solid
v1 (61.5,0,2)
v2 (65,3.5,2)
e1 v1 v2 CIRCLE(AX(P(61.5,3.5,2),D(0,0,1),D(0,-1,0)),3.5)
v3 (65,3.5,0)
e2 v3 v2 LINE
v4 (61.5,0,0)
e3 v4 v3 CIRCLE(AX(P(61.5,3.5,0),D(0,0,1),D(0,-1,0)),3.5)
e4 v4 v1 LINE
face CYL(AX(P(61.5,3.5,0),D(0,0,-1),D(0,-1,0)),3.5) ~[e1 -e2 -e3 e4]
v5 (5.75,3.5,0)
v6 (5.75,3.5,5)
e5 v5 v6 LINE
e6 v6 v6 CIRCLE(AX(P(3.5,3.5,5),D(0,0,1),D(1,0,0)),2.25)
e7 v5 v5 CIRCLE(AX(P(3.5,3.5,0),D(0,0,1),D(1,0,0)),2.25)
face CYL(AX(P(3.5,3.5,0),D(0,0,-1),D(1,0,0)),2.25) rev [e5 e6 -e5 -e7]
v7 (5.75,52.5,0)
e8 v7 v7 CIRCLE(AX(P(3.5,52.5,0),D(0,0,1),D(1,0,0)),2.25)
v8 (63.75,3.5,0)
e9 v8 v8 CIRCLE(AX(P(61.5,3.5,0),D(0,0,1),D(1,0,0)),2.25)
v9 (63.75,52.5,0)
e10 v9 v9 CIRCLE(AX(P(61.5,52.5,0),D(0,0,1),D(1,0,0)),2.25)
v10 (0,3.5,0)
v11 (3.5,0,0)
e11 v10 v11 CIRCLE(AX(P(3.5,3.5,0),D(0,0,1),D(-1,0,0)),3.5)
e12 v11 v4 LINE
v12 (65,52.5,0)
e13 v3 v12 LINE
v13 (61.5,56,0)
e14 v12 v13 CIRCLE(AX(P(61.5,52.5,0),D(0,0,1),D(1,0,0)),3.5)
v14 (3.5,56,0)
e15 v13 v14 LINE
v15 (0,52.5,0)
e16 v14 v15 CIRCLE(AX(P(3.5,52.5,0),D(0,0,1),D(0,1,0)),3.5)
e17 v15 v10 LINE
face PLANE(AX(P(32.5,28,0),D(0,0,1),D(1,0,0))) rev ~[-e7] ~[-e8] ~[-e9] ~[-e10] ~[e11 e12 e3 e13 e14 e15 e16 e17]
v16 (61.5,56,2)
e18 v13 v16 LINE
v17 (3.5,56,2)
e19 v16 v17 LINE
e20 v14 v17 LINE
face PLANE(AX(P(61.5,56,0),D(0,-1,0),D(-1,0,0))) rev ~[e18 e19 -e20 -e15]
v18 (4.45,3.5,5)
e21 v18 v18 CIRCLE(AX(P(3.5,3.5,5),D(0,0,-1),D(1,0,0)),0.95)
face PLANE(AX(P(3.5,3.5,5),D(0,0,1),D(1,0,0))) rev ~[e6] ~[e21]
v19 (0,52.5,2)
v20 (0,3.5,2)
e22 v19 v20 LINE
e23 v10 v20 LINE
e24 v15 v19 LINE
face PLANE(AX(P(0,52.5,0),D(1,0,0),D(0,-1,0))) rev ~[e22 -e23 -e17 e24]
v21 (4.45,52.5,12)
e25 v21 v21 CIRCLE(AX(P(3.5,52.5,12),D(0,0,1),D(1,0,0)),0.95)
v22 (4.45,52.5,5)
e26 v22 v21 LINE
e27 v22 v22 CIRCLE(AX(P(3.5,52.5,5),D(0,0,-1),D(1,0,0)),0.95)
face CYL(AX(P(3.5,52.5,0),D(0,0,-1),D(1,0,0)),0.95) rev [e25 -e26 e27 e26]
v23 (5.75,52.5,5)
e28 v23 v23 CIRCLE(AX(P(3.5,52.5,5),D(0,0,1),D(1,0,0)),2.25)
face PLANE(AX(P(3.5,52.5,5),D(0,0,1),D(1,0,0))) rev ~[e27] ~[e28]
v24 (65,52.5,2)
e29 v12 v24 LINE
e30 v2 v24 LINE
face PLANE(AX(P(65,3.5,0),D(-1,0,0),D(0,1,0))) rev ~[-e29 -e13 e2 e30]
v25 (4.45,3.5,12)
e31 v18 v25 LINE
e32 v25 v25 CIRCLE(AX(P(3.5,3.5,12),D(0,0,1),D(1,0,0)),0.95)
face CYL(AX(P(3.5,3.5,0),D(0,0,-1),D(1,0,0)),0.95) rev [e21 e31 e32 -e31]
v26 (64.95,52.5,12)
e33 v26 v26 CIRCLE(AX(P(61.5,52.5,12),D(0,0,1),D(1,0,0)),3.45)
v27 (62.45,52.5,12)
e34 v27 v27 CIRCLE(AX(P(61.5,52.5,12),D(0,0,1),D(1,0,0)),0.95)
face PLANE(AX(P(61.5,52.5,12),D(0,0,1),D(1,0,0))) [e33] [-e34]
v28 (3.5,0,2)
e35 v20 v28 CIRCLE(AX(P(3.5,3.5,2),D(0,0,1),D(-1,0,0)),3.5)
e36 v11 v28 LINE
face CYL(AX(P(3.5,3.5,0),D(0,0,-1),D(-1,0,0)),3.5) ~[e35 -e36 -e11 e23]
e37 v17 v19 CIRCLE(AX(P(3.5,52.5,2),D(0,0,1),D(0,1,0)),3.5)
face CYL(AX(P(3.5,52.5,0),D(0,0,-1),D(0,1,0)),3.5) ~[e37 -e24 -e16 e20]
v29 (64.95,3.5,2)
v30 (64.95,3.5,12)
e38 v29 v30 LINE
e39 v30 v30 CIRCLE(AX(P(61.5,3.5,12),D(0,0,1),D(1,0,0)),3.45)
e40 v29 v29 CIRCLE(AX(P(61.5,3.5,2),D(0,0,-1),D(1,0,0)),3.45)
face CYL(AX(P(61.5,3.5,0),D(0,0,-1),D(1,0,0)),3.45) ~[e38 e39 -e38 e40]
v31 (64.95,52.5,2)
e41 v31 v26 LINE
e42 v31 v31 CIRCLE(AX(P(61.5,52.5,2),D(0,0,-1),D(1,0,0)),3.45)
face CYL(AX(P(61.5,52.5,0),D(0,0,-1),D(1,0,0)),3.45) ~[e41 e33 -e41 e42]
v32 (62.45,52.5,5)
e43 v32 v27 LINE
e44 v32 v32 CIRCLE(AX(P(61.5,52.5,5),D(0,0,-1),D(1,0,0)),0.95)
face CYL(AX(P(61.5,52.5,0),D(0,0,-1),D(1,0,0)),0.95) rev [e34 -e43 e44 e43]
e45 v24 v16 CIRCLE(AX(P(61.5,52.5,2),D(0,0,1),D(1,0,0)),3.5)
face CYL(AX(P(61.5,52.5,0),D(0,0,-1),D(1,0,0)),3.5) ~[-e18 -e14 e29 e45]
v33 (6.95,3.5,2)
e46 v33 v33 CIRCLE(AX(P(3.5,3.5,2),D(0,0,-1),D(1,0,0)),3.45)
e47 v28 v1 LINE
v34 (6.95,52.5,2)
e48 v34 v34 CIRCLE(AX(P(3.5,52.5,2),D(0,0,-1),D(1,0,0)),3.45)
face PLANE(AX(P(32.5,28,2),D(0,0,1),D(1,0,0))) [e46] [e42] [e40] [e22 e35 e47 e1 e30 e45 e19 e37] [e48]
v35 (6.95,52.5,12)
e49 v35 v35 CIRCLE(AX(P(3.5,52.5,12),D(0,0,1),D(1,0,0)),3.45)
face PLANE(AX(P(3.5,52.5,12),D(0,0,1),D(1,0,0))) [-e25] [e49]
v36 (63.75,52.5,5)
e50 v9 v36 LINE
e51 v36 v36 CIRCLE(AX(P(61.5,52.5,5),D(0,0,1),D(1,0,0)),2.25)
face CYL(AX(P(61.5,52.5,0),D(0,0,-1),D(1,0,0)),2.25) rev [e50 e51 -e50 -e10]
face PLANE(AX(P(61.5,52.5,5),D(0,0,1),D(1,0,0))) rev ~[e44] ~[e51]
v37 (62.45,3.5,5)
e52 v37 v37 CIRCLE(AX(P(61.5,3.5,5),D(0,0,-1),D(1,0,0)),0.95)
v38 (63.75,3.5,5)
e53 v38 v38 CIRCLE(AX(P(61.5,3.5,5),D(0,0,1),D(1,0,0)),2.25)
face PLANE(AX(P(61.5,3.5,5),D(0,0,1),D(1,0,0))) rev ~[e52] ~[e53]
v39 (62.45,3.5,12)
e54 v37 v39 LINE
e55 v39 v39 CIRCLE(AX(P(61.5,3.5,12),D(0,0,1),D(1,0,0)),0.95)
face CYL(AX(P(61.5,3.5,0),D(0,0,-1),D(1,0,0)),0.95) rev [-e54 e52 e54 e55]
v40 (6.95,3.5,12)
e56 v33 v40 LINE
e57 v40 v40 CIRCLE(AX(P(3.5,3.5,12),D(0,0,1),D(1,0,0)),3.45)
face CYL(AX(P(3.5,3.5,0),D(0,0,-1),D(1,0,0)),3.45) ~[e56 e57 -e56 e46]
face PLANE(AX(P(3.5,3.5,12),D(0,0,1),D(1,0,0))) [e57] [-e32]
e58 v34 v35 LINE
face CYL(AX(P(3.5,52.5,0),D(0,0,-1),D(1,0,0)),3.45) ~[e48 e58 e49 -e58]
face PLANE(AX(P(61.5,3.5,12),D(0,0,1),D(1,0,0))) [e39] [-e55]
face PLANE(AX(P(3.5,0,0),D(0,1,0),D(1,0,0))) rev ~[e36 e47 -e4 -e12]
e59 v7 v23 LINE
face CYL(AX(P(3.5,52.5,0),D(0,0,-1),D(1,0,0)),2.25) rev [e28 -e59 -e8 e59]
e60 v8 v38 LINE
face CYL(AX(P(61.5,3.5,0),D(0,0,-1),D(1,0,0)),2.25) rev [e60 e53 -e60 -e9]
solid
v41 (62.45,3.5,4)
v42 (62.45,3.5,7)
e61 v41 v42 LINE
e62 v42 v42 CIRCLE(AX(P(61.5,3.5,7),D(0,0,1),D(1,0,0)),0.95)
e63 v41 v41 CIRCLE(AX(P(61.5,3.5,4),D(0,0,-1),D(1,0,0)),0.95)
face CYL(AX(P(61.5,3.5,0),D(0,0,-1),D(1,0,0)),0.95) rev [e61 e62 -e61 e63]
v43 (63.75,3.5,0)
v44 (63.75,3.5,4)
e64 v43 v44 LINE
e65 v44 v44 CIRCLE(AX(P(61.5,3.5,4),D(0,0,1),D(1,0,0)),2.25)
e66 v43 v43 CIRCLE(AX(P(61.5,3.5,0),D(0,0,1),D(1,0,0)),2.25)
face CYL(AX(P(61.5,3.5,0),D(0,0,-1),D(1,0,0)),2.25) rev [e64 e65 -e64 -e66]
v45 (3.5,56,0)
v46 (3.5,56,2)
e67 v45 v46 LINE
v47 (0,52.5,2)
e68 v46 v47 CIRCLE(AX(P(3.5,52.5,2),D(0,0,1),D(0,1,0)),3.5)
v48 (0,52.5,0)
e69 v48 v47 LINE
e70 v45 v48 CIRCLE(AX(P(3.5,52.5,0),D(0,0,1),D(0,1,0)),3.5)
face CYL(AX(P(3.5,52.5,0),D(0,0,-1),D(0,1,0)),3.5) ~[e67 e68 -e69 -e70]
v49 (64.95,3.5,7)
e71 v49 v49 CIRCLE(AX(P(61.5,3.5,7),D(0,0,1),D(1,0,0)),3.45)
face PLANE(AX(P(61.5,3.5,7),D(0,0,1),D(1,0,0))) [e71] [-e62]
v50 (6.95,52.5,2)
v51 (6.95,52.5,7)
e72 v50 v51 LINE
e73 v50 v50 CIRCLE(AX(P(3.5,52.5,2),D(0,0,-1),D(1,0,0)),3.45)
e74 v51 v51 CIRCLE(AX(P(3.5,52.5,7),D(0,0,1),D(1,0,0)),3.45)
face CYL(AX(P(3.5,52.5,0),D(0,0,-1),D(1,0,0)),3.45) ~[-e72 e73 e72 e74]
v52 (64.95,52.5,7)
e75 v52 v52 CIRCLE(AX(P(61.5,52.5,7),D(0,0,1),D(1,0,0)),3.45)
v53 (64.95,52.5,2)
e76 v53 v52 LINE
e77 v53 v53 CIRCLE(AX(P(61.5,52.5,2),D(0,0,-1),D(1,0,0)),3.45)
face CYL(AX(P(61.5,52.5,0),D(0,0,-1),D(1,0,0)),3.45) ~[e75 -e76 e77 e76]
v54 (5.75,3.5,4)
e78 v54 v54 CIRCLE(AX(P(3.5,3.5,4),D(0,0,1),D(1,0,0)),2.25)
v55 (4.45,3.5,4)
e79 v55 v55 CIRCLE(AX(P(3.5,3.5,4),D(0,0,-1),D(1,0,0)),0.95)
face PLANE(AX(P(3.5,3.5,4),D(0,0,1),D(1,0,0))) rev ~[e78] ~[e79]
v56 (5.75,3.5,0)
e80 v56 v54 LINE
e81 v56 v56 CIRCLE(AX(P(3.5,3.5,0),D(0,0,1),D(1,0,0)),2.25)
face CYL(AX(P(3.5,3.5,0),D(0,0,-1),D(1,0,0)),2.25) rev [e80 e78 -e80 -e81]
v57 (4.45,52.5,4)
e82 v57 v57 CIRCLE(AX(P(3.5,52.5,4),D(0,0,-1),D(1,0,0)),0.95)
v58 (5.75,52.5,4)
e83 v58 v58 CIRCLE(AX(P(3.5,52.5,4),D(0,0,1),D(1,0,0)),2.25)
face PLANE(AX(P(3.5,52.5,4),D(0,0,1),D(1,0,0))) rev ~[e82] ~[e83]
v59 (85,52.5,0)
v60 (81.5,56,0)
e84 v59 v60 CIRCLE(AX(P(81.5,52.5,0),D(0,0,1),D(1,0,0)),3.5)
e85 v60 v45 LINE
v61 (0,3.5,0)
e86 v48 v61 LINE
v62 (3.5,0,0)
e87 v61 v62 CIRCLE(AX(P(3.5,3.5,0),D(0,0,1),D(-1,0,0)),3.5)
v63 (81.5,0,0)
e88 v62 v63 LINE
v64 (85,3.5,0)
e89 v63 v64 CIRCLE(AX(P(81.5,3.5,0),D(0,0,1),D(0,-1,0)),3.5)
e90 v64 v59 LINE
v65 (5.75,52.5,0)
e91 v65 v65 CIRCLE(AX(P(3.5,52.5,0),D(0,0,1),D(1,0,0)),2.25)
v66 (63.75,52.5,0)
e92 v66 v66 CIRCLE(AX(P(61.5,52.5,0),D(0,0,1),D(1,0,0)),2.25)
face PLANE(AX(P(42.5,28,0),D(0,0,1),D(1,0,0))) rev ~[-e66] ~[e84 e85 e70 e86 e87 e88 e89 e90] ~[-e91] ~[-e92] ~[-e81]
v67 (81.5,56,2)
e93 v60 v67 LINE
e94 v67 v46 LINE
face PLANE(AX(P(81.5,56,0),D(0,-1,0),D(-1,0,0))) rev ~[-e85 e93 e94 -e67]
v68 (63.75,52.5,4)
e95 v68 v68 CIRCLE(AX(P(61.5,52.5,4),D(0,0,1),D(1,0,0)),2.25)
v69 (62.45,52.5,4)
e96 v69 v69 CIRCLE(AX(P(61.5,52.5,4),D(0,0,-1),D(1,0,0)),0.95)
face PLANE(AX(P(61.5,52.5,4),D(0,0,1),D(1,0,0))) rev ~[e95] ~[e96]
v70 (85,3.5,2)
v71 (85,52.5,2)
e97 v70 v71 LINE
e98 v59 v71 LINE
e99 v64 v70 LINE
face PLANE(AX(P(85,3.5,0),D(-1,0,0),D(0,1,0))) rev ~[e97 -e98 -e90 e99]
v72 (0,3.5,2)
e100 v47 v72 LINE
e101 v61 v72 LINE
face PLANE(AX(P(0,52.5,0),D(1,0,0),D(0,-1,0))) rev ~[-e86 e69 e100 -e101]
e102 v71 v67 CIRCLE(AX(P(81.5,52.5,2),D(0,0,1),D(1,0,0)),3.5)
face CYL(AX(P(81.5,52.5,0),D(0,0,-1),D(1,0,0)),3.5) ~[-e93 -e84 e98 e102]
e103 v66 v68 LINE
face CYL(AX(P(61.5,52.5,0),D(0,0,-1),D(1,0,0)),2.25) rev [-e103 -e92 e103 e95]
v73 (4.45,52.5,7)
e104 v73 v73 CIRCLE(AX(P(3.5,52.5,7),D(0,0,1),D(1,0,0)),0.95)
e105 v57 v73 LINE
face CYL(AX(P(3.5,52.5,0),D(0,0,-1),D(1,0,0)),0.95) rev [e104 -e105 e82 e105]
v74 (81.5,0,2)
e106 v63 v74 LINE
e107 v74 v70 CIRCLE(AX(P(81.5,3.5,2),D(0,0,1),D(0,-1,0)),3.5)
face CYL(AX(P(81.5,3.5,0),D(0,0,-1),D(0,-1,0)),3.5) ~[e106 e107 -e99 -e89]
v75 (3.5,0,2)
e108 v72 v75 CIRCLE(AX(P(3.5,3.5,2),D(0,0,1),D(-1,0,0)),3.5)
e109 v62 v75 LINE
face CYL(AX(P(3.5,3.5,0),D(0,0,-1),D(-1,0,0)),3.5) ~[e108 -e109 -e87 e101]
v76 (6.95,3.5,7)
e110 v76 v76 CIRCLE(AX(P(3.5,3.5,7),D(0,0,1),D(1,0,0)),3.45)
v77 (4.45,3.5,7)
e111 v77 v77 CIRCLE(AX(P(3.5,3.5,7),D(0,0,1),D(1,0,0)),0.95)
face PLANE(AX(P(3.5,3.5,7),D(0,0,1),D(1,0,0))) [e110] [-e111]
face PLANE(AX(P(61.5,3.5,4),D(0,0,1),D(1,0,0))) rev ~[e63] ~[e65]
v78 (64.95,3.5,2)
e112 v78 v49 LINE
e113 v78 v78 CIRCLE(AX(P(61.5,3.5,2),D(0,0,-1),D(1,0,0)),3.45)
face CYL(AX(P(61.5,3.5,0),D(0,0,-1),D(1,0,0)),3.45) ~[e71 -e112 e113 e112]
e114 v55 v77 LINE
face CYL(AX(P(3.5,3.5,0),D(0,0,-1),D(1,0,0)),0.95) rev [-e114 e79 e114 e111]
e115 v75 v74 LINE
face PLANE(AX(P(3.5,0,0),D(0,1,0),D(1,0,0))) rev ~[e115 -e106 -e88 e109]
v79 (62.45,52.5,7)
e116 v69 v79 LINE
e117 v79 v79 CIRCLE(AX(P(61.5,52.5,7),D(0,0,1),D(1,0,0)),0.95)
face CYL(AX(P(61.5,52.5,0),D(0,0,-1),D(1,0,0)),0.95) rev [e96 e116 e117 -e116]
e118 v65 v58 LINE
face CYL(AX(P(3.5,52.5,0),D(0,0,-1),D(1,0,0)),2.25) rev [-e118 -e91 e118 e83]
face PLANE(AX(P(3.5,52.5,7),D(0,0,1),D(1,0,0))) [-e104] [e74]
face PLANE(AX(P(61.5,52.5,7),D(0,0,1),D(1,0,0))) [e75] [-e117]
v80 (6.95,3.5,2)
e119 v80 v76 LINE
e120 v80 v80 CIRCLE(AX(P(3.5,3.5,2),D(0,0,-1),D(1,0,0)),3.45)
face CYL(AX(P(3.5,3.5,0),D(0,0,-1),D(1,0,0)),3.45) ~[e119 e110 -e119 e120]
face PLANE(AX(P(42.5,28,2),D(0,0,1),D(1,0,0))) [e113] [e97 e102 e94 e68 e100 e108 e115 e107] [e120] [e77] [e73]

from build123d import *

# Parameters (mm, degrees)
F0_R     = 3.45
F0_R_2   = 2.25
F2_DEPTH = 2
F0_R_3   = 0.95
F3_DEPTH = 7
F1_R     = 3.45
F1_R_2   = 2.25
F4_DEPTH = 2
F1_R_3   = 0.95
F5_DEPTH = 12
F6_DEPTH = 4
F7_DEPTH = 5


with BuildPart() as f2:
    # F0 (on Top) → F2 (new body)
    with BuildSketch(Plane.XY):
        with BuildLine():
            ThreePointArc((0, 3.5), (1.0251262658, 1.0251262658), (3.5, 0))
            Line((3.5, 0), (81.5, 0))
            ThreePointArc((81.5, 0), (83.9748737342, 1.0251262658), (85, 3.5))
            Line((85, 3.5), (85, 52.5))
            ThreePointArc((85, 52.5), (83.9748737342, 54.9748737342), (81.5, 56))
            Line((81.5, 56), (3.5, 56))
            ThreePointArc((3.5, 56), (1.0251262658, 54.9748737342), (0, 52.5))
            Line((0, 52.5), (0, 3.5))
        make_face()
        with Locations((3.5, 3.5)):
            Circle(F0_R, mode=Mode.SUBTRACT)
        with Locations((61.5, 3.5)):
            Circle(F0_R, mode=Mode.SUBTRACT)
        with Locations((3.5, 52.5)):
            Circle(F0_R, mode=Mode.SUBTRACT)
        with Locations((61.5, 52.5)):
            Circle(F0_R, mode=Mode.SUBTRACT)
        with Locations((3.5, 52.5)):
            Circle(F0_R)
        with Locations((3.5, 52.5)):
            Circle(F0_R_2, mode=Mode.SUBTRACT)
        with Locations((61.5, 52.5)):
            Circle(F0_R)
        with Locations((61.5, 52.5)):
            Circle(F0_R_2, mode=Mode.SUBTRACT)
        with Locations((61.5, 3.5)):
            Circle(F0_R)
        with Locations((61.5, 3.5)):
            Circle(F0_R_2, mode=Mode.SUBTRACT)
        with Locations((3.5, 3.5)):
            Circle(F0_R)
        with Locations((3.5, 3.5)):
            Circle(F0_R_2, mode=Mode.SUBTRACT)
    extrude(amount=F2_DEPTH)

    # F0 (on Top) → F3 (join)
    with BuildSketch(Plane.XY):
        with Locations((3.5, 3.5)):
            Circle(F0_R)
        with Locations((3.5, 3.5)):
            Circle(F0_R_2, mode=Mode.SUBTRACT)
        with Locations((3.5, 52.5)):
            Circle(F0_R)
        with Locations((3.5, 52.5)):
            Circle(F0_R_2, mode=Mode.SUBTRACT)
        with Locations((61.5, 3.5)):
            Circle(F0_R)
        with Locations((61.5, 3.5)):
            Circle(F0_R_2, mode=Mode.SUBTRACT)
        with Locations((61.5, 52.5)):
            Circle(F0_R)
        with Locations((61.5, 52.5)):
            Circle(F0_R_2, mode=Mode.SUBTRACT)
        with Locations((61.5, 52.5)):
            Circle(F0_R_2)
        with Locations((61.5, 52.5)):
            Circle(F0_R_3, mode=Mode.SUBTRACT)
        with Locations((61.5, 3.5)):
            Circle(F0_R_2)
        with Locations((61.5, 3.5)):
            Circle(F0_R_3, mode=Mode.SUBTRACT)
        with Locations((3.5, 3.5)):
            Circle(F0_R_2)
        with Locations((3.5, 3.5)):
            Circle(F0_R_3, mode=Mode.SUBTRACT)
        with Locations((3.5, 52.5)):
            Circle(F0_R_2)
        with Locations((3.5, 52.5)):
            Circle(F0_R_3, mode=Mode.SUBTRACT)
    extrude(amount=F3_DEPTH)


with BuildPart() as f4:
    # F1 (on Top) → F4 (new body)
    with BuildSketch(Plane.XY):
        with BuildLine():
            ThreePointArc((0, 3.5), (1.0251262658, 1.0251262658), (3.5, 0))
            Line((3.5, 0), (61.5, 0))
            ThreePointArc((61.5, 0), (63.9748737342, 1.0251262658), (65, 3.5))
            Line((65, 3.5), (65, 52.5))
            ThreePointArc((65, 52.5), (63.9748737342, 54.9748737342), (61.5, 56))
            Line((61.5, 56), (3.5, 56))
            ThreePointArc((3.5, 56), (1.0251262658, 54.9748737342), (0, 52.5))
            Line((0, 52.5), (0, 3.5))
        make_face()
        with Locations((3.5, 3.5)):
            Circle(F1_R, mode=Mode.SUBTRACT)
        with Locations((61.5, 3.5)):
            Circle(F1_R, mode=Mode.SUBTRACT)
        with Locations((3.5, 52.5)):
            Circle(F1_R, mode=Mode.SUBTRACT)
        with Locations((61.5, 52.5)):
            Circle(F1_R, mode=Mode.SUBTRACT)
        with Locations((3.5, 3.5)):
            Circle(F1_R)
        with Locations((3.5, 3.5)):
            Circle(F1_R_2, mode=Mode.SUBTRACT)
        with Locations((61.5, 3.5)):
            Circle(F1_R)
        with Locations((61.5, 3.5)):
            Circle(F1_R_2, mode=Mode.SUBTRACT)
        with Locations((3.5, 52.5)):
            Circle(F1_R)
        with Locations((3.5, 52.5)):
            Circle(F1_R_2, mode=Mode.SUBTRACT)
        with Locations((61.5, 52.5)):
            Circle(F1_R)
        with Locations((61.5, 52.5)):
            Circle(F1_R_2, mode=Mode.SUBTRACT)
    extrude(amount=F4_DEPTH)

    # F1 (on Top) → F5 (join)
    with BuildSketch(Plane.XY):
        with Locations((61.5, 3.5)):
            Circle(F1_R)
        with Locations((61.5, 3.5)):
            Circle(F1_R_2, mode=Mode.SUBTRACT)
        with Locations((3.5, 3.5)):
            Circle(F1_R)
        with Locations((3.5, 3.5)):
            Circle(F1_R_2, mode=Mode.SUBTRACT)
        with Locations((3.5, 52.5)):
            Circle(F1_R)
        with Locations((3.5, 52.5)):
            Circle(F1_R_2, mode=Mode.SUBTRACT)
        with Locations((61.5, 52.5)):
            Circle(F1_R)
        with Locations((61.5, 52.5)):
            Circle(F1_R_2, mode=Mode.SUBTRACT)
        with Locations((61.5, 3.5)):
            Circle(F1_R_2)
        with Locations((61.5, 3.5)):
            Circle(F1_R_3, mode=Mode.SUBTRACT)
        with Locations((3.5, 3.5)):
            Circle(F1_R_2)
        with Locations((3.5, 3.5)):
            Circle(F1_R_3, mode=Mode.SUBTRACT)
        with Locations((3.5, 52.5)):
            Circle(F1_R_2)
        with Locations((3.5, 52.5)):
            Circle(F1_R_3, mode=Mode.SUBTRACT)
        with Locations((61.5, 52.5)):
            Circle(F1_R_2)
        with Locations((61.5, 52.5)):
            Circle(F1_R_3, mode=Mode.SUBTRACT)
    extrude(amount=F5_DEPTH)


with BuildPart() as f6_tool:
    # F0 (on Top) → F6 (new body)
    with BuildSketch(Plane.XY):
        with Locations((61.5, 3.5)):
            Circle(F0_R_2)
        with Locations((61.5, 3.5)):
            Circle(F0_R_3, mode=Mode.SUBTRACT)
        with Locations((61.5, 52.5)):
            Circle(F0_R_2)
        with Locations((61.5, 52.5)):
            Circle(F0_R_3, mode=Mode.SUBTRACT)
        with Locations((3.5, 52.5)):
            Circle(F0_R_2)
        with Locations((3.5, 52.5)):
            Circle(F0_R_3, mode=Mode.SUBTRACT)
        with Locations((3.5, 3.5)):
            Circle(F0_R_2)
        with Locations((3.5, 3.5)):
            Circle(F0_R_3, mode=Mode.SUBTRACT)
        with Locations((61.5, 3.5)):
            Circle(F0_R_3)
        with Locations((61.5, 52.5)):
            Circle(F0_R_3)
        with Locations((3.5, 52.5)):
            Circle(F0_R_3)
        with Locations((3.5, 3.5)):
            Circle(F0_R_3)
    extrude(amount=F6_DEPTH)


with BuildPart() as f2_1:
    add(f2.part)

    # F6: cut by f6_tool
    add(f6_tool.part, mode=Mode.SUBTRACT)


with BuildPart() as f4_1:
    add(f4.part)

    # F6: cut by f6_tool
    add(f6_tool.part, mode=Mode.SUBTRACT)

    # F1 (on Top) → F7 (cut)
    with BuildSketch(Plane.XY):
        with Locations((61.5, 3.5)):
            Circle(F1_R_2)
        with Locations((61.5, 3.5)):
            Circle(F1_R_3, mode=Mode.SUBTRACT)
        with Locations((61.5, 3.5)):
            Circle(F1_R_3)
        with Locations((3.5, 3.5)):
            Circle(F1_R_2)
        with Locations((3.5, 3.5)):
            Circle(F1_R_3, mode=Mode.SUBTRACT)
        with Locations((3.5, 3.5)):
            Circle(F1_R_3)
        with Locations((3.5, 52.5)):
            Circle(F1_R_2)
        with Locations((3.5, 52.5)):
            Circle(F1_R_3, mode=Mode.SUBTRACT)
        with Locations((3.5, 52.5)):
            Circle(F1_R_3)
        with Locations((61.5, 52.5)):
            Circle(F1_R_2)
        with Locations((61.5, 52.5)):
            Circle(F1_R_3, mode=Mode.SUBTRACT)
        with Locations((61.5, 52.5)):
            Circle(F1_R_3)
    extrude(amount=F7_DEPTH, mode=Mode.SUBTRACT)


solid = Compound([f2_1.part, f4_1.part])
